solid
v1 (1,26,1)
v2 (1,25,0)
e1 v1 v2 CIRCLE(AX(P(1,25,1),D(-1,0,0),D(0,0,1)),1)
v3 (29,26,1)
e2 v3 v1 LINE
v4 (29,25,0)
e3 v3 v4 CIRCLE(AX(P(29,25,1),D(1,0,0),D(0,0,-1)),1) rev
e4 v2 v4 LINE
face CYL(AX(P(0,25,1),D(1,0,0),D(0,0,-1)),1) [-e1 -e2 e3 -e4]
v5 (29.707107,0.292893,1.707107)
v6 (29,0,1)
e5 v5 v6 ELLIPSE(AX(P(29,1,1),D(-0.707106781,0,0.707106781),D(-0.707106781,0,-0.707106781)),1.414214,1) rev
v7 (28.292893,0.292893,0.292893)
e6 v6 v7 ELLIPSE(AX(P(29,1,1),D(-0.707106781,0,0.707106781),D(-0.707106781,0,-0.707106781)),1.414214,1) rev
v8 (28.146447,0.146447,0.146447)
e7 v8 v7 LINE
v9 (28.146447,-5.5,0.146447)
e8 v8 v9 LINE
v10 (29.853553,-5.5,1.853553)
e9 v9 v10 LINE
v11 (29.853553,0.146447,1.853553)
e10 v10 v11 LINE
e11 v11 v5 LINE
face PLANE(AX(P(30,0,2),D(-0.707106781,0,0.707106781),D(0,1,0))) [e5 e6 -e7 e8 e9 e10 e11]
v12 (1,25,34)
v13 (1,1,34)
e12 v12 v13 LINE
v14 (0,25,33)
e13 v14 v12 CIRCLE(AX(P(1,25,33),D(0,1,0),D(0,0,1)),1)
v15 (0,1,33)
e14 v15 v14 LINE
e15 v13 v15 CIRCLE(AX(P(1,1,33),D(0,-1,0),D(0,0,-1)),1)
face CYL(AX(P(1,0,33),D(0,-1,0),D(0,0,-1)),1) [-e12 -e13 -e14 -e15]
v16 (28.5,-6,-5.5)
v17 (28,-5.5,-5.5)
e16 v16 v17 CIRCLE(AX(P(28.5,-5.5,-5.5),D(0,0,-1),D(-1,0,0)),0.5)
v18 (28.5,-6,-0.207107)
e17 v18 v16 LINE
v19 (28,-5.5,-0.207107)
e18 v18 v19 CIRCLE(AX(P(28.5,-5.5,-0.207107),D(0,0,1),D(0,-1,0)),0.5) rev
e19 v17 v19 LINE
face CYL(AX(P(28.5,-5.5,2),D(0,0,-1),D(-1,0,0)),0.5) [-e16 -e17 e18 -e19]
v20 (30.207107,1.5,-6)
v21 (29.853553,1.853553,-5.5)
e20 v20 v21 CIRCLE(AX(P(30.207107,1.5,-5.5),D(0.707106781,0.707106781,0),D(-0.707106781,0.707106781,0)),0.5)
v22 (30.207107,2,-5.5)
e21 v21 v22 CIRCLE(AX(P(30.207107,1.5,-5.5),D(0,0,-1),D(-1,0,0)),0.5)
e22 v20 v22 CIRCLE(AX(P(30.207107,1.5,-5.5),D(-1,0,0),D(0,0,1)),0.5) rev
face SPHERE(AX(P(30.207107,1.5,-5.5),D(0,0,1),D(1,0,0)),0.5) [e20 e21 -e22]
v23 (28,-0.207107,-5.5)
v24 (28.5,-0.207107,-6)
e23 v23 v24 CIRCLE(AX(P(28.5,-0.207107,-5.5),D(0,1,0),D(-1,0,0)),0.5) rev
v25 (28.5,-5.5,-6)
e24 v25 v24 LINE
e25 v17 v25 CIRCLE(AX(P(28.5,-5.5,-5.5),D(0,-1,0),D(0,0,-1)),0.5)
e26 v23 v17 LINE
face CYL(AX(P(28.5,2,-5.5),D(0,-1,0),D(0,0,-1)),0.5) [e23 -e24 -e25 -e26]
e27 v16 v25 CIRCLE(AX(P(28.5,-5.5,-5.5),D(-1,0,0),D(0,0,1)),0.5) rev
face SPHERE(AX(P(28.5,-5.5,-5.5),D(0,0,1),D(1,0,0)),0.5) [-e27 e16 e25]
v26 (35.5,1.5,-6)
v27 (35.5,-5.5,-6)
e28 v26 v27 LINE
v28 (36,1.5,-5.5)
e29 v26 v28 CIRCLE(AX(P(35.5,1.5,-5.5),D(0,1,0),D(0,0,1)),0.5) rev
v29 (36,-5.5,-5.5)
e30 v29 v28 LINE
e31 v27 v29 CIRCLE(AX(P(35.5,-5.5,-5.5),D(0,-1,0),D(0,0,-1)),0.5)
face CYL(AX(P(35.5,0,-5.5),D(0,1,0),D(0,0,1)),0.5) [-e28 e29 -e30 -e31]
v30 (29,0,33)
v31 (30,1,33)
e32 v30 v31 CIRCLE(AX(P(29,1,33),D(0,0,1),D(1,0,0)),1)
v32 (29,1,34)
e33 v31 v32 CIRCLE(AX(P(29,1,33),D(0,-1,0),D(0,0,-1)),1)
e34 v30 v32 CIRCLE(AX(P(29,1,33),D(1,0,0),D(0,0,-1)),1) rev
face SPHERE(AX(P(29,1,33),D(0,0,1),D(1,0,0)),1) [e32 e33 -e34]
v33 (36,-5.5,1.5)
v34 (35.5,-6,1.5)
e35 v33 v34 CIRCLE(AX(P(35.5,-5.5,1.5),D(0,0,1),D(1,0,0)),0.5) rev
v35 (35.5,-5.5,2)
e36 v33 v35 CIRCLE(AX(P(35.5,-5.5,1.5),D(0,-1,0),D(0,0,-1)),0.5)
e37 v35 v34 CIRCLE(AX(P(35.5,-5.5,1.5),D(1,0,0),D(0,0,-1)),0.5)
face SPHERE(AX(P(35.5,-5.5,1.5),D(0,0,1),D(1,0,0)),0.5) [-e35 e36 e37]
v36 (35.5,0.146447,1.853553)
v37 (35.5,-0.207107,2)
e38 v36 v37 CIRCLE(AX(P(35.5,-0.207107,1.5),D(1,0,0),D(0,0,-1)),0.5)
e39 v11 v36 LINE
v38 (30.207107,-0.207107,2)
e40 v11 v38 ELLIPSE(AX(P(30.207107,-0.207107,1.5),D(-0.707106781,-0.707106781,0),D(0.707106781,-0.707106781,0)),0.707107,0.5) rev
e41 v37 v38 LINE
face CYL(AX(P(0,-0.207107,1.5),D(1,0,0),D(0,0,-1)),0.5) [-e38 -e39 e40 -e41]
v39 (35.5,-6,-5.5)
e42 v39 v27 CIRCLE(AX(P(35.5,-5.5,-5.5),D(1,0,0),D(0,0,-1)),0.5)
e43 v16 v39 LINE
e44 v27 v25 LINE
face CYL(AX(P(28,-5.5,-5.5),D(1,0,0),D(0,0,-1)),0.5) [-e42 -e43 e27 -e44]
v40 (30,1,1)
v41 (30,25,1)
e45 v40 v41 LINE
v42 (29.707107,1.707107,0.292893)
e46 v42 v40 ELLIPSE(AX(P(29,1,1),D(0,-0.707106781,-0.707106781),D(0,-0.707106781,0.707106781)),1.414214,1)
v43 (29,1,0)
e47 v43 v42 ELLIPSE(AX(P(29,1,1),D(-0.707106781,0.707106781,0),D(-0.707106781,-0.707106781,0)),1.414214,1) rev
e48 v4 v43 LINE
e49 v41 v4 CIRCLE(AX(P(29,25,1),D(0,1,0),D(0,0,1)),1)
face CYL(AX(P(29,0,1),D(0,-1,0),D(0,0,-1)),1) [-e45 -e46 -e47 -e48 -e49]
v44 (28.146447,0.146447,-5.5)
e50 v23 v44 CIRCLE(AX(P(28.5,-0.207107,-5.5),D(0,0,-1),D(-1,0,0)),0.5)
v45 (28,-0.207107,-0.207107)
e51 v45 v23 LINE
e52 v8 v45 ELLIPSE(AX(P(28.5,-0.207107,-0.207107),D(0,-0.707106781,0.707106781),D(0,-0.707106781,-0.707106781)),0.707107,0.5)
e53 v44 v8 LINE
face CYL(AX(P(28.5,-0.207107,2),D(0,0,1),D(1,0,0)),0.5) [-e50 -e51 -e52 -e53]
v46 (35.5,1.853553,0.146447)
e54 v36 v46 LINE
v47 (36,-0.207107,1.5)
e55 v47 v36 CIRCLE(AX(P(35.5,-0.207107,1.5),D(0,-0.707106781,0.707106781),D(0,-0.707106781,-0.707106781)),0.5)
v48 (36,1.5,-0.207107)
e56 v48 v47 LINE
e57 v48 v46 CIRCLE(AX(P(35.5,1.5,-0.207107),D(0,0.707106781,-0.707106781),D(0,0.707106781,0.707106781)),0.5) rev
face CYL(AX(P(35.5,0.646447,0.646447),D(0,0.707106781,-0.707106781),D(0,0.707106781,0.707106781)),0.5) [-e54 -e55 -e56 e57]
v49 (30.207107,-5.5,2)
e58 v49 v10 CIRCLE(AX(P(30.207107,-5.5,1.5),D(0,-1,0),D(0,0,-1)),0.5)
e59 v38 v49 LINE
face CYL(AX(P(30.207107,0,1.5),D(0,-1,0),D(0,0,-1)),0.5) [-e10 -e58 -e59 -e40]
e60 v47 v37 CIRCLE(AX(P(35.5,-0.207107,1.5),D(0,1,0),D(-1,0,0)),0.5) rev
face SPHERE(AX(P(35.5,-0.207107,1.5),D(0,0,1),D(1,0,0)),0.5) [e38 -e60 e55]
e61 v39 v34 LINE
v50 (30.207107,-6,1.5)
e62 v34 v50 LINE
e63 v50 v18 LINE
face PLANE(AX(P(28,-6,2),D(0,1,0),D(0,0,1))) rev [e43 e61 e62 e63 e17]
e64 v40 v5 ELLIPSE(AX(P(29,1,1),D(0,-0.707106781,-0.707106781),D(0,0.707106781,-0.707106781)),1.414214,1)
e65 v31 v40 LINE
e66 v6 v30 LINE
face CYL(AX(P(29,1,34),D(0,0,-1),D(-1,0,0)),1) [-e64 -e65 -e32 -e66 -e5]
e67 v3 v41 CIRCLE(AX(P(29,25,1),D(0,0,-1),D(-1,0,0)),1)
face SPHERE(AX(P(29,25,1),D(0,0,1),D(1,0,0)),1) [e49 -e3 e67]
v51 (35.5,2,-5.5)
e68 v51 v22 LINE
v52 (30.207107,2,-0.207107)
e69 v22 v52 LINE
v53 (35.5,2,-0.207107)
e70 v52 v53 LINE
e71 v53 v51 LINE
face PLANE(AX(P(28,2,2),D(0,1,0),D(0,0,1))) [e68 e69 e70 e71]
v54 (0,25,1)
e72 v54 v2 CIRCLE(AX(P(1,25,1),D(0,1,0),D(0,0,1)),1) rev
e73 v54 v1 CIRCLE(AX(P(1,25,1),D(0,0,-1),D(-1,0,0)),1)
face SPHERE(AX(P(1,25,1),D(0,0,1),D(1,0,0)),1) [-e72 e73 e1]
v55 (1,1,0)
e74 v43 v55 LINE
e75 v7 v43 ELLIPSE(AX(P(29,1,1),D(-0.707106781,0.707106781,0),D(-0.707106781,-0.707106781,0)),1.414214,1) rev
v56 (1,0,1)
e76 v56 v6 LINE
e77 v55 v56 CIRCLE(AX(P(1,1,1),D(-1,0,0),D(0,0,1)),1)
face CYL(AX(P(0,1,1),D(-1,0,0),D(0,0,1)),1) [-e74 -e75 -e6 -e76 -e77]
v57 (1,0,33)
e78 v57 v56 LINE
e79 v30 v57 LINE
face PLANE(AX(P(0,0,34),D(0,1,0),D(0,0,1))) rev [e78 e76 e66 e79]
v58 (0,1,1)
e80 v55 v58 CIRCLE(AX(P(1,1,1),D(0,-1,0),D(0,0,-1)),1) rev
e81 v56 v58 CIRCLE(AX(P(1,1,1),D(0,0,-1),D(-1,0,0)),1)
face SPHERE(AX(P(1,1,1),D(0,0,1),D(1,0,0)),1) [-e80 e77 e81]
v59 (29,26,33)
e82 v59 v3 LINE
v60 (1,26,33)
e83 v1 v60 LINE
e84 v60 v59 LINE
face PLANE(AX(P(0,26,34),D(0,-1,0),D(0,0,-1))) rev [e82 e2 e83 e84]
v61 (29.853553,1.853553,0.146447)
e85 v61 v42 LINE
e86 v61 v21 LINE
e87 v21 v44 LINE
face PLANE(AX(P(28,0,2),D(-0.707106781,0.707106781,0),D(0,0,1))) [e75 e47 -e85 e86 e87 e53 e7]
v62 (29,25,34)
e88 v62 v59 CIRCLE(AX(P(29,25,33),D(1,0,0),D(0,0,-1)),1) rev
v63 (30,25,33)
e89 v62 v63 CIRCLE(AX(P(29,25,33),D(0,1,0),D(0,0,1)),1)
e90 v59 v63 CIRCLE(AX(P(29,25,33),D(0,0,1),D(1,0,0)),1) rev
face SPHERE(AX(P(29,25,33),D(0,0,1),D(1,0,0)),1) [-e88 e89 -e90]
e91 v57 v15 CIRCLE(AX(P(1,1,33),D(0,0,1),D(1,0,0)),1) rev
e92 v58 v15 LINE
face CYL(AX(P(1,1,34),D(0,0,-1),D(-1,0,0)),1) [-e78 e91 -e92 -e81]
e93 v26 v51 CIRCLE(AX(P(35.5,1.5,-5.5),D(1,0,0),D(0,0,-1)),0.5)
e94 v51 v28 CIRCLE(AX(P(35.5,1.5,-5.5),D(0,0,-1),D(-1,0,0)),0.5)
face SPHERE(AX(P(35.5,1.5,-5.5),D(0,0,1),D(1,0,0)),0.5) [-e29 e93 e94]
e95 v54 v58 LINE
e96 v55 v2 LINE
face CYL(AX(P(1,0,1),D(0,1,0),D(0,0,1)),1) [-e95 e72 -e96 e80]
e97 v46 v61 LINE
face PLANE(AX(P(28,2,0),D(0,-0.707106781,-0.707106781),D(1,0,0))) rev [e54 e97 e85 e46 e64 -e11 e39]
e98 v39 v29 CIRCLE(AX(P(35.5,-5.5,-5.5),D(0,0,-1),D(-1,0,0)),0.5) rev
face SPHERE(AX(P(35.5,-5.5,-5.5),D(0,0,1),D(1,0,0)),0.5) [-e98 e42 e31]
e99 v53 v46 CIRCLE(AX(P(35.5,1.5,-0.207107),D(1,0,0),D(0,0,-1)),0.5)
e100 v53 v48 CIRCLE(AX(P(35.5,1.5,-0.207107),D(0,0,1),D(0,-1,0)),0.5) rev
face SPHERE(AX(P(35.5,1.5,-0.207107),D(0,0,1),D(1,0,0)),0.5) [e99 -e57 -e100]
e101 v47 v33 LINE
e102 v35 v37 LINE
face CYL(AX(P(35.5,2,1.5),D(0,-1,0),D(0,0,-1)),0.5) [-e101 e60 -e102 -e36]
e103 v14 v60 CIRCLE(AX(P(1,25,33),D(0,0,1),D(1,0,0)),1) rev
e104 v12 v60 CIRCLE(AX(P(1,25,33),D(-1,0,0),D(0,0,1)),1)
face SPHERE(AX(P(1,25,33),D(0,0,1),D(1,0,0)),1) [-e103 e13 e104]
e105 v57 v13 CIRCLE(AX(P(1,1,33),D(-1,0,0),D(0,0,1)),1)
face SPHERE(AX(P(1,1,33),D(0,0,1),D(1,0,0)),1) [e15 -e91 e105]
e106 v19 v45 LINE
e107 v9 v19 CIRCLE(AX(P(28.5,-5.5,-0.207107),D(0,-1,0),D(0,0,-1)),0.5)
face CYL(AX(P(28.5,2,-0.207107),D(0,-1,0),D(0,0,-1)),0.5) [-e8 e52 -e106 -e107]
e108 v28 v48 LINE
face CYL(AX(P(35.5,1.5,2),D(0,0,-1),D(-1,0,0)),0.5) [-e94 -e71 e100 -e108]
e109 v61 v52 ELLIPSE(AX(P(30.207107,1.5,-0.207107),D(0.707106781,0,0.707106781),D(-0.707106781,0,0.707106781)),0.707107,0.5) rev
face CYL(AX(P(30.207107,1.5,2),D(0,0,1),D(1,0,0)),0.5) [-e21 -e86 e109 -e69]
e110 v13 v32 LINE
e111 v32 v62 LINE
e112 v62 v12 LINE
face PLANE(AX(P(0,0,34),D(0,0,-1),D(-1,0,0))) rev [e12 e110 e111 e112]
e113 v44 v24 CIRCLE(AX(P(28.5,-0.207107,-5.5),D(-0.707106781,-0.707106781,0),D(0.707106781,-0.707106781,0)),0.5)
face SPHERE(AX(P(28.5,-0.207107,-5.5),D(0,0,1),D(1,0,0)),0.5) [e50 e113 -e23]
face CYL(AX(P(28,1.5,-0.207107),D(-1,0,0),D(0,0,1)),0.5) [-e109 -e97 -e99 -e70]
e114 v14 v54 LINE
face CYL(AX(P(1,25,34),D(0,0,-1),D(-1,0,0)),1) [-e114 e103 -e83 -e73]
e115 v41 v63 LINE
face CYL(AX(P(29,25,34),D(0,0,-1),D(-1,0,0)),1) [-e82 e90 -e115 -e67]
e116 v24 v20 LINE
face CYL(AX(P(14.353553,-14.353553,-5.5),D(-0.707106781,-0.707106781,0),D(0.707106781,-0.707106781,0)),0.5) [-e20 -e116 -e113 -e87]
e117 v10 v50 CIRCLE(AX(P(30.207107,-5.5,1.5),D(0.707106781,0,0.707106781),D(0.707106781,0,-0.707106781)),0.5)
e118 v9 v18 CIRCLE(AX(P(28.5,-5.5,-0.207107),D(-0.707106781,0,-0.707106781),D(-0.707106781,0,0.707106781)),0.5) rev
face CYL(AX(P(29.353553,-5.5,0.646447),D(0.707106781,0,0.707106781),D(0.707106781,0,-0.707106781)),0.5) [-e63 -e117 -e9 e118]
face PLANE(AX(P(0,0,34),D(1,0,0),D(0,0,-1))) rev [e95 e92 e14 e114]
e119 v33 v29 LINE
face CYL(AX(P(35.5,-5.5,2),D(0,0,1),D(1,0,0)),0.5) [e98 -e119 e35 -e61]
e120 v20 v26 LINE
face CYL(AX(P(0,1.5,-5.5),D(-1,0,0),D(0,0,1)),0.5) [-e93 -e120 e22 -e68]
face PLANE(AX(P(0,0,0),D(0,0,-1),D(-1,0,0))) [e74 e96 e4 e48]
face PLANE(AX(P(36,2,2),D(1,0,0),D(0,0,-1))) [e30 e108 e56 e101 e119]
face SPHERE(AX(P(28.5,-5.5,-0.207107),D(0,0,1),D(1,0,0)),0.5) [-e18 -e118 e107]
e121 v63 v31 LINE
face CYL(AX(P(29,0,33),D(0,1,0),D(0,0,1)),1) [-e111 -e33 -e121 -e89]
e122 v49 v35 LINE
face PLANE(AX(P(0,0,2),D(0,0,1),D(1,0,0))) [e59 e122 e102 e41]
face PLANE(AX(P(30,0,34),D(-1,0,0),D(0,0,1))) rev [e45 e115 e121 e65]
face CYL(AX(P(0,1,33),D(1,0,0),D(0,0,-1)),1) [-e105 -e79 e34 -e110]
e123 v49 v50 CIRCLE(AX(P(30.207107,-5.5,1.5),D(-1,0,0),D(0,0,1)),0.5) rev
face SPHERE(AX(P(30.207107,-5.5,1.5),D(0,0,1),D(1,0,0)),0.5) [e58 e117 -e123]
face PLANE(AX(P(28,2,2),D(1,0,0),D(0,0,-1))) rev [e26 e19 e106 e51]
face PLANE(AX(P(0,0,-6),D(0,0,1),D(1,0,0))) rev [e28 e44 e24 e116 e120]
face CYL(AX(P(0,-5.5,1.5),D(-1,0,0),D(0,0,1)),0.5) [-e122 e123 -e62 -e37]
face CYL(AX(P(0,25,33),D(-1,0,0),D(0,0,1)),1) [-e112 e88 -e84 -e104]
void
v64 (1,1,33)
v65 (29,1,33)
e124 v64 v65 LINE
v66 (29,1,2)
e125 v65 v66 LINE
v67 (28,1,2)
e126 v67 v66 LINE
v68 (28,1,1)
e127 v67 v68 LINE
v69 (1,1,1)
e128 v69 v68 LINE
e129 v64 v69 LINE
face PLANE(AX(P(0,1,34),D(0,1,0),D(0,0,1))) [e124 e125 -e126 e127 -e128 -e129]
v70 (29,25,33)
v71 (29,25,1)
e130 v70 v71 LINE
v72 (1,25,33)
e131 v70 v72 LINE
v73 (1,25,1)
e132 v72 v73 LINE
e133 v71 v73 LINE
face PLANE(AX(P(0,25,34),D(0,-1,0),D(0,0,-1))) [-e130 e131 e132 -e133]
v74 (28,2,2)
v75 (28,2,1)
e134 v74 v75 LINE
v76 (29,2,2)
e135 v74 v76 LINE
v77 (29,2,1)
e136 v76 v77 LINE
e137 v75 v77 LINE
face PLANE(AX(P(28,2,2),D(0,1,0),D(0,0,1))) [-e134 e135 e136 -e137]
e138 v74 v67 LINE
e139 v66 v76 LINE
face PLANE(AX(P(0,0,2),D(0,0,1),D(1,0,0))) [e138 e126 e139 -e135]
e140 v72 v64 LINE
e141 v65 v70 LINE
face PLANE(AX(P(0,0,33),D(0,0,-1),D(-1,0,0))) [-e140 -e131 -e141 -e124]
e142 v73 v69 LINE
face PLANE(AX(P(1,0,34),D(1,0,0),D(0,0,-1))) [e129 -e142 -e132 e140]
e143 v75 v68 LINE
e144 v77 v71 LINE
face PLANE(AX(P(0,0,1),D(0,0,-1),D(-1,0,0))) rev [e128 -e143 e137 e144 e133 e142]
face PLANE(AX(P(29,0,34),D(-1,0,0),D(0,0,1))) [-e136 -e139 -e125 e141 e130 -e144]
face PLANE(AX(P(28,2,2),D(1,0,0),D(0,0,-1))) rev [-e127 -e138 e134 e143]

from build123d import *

# Parameters (mm, degrees)
SKETCH1_W                = 30
SKETCH1_H                = 26
BOSS_EXTRUDE1_DEPTH      = 34
SHELL1_T                 = 1
BOSS_EXTRUDE3_DEPTH      = 6
BOSS_EXTRUDE3_DEPTH_BACK = 2
SKETCH2_W                = 8
SKETCH2_H                = 8
CHAMFER2_SIZE            = 2
FILLET1_R                = 1
FILLET2_R                = 0.5


with BuildPart() as part:
    # Sketch1 → Boss-Extrude1 (new body)
    with BuildSketch(Plane.XY):
        with Locations((15, 13)):
            Rectangle(SKETCH1_W, SKETCH1_H)
    extrude(amount=BOSS_EXTRUDE1_DEPTH)

    # Shell1 (no face opened: a closed hollow body)
    add(offset(amount=-SHELL1_T, mode=Mode.PRIVATE), mode=Mode.SUBTRACT)

    # Sketch2 → Boss-Extrude3 (add, two sides: drawn at the far end of the back side and taken through both)
    with BuildSketch(Plane(origin=(0, 0, 0), x_dir=(-1, 0, 0), z_dir=(0, 0, -1)).offset(-BOSS_EXTRUDE3_DEPTH_BACK)):
        with Locations((-32, -2)):
            Rectangle(SKETCH2_W, SKETCH2_H)
    extrude(amount=BOSS_EXTRUDE3_DEPTH + BOSS_EXTRUDE3_DEPTH_BACK)

    # Chamfer2
    chamfer2_edges = [part.edges().sort_by_distance(p)[0] for p in [
        (28, -3, 2),
        (28, 2, -3),
        (33, 2, 2),
    ]]
    chamfer(chamfer2_edges, length=CHAMFER2_SIZE)

    # Fillet1
    # the kernel refuses this fillet: 1 mm, written as the material it takes off along each edge
    with BuildSketch(Plane(origin=(1, 25, 1), x_dir=(0, 1, 0), z_dir=(0, 0, -1))) as fillet1_piece_1_section:
        Polygon((0, 0), (FILLET1_R, 0), (FILLET1_R, -FILLET1_R), (0, -FILLET1_R), align=None)
    fillet1_piece_1 = extrude(amount=FILLET1_R, mode=Mode.PRIVATE)
    fillet1_piece_1 = fillet1_piece_1 - Plane(origin=(1, 25, 1), x_dir=(0.7071067811865475, -0.7071067811865475, 0), z_dir=(0, 0, -1)) * Sphere(FILLET1_R, mode=Mode.PRIVATE)
    add(fillet1_piece_1, mode=Mode.SUBTRACT)
    with BuildSketch(Plane(origin=(1, 1, 1), x_dir=(0, 0, -1), z_dir=(0, -1, 0))) as fillet1_piece_2_section:
        Polygon((0, 0), (FILLET1_R, 0), (FILLET1_R, -FILLET1_R), (0, -FILLET1_R), align=None)
    fillet1_piece_2 = extrude(amount=FILLET1_R, mode=Mode.PRIVATE)
    fillet1_piece_2 = fillet1_piece_2 - Plane(origin=(1, 1, 1), x_dir=(0.7071067811865475, 0, 0.7071067811865475), z_dir=(0, -1, 0)) * Sphere(FILLET1_R, mode=Mode.PRIVATE)
    add(fillet1_piece_2, mode=Mode.SUBTRACT)
    with BuildSketch(Plane(origin=(29, 25, 1), x_dir=(0, 0, -1), z_dir=(0, 1, 0))) as fillet1_piece_3_section:
        Polygon((0, 0), (FILLET1_R, 0), (FILLET1_R, -FILLET1_R), (0, -FILLET1_R), align=None)
    fillet1_piece_3 = extrude(amount=FILLET1_R, mode=Mode.PRIVATE)
    fillet1_piece_3 = fillet1_piece_3 - Plane(origin=(29, 25, 1), x_dir=(-0.7071067811865475, 0, 0.7071067811865475), z_dir=(0, 1, 0)) * Sphere(FILLET1_R, mode=Mode.PRIVATE)
    add(fillet1_piece_3, mode=Mode.SUBTRACT)
    with BuildSketch(Plane(origin=(1, 1, 33), x_dir=(-1, 0, 0), z_dir=(0, -1, 0))) as fillet1_piece_4_section:
        Polygon((0, 0), (FILLET1_R, 0), (FILLET1_R, -FILLET1_R), (0, -FILLET1_R), align=None)
    fillet1_piece_4 = extrude(amount=FILLET1_R, mode=Mode.PRIVATE)
    fillet1_piece_4 = fillet1_piece_4 - Plane(origin=(1, 1, 33), x_dir=(0.7071067811865475, 0, -0.7071067811865475), z_dir=(0, -1, 0)) * Sphere(FILLET1_R, mode=Mode.PRIVATE)
    add(fillet1_piece_4, mode=Mode.SUBTRACT)
    with BuildSketch(Plane(origin=(29, 1, 33), x_dir=(1, 0, 0), z_dir=(0, -1, 0))) as fillet1_piece_5_section:
        Polygon((0, 0), (FILLET1_R, 0), (FILLET1_R, FILLET1_R), (0, FILLET1_R), align=None)
    fillet1_piece_5 = extrude(amount=FILLET1_R, mode=Mode.PRIVATE)
    fillet1_piece_5 = fillet1_piece_5 - Plane(origin=(29, 1, 33), x_dir=(-0.7071067811865475, 0, -0.7071067811865475), z_dir=(0, -1, 0)) * Sphere(FILLET1_R, mode=Mode.PRIVATE)
    add(fillet1_piece_5, mode=Mode.SUBTRACT)
    with BuildSketch(Plane(origin=(29, 25, 33), x_dir=(1, 0, 0), z_dir=(0, 1, 0))) as fillet1_piece_6_section:
        Polygon((0, 0), (FILLET1_R, 0), (FILLET1_R, -FILLET1_R), (0, -FILLET1_R), align=None)
    fillet1_piece_6 = extrude(amount=FILLET1_R, mode=Mode.PRIVATE)
    fillet1_piece_6 = fillet1_piece_6 - Plane(origin=(29, 25, 33), x_dir=(-0.7071067811865475, 0, -0.7071067811865475), z_dir=(0, 1, 0)) * Sphere(FILLET1_R, mode=Mode.PRIVATE)
    add(fillet1_piece_6, mode=Mode.SUBTRACT)
    with BuildSketch(Plane(origin=(1, 25, 33), x_dir=(-1, 0, 0), z_dir=(0, 1, 0))) as fillet1_piece_7_section:
        Polygon((0, 0), (FILLET1_R, 0), (FILLET1_R, FILLET1_R), (0, FILLET1_R), align=None)
    fillet1_piece_7 = extrude(amount=FILLET1_R, mode=Mode.PRIVATE)
    fillet1_piece_7 = fillet1_piece_7 - Plane(origin=(1, 25, 33), x_dir=(0.7071067811865475, 0, -0.7071067811865475), z_dir=(0, 1, 0)) * Sphere(FILLET1_R, mode=Mode.PRIVATE)
    add(fillet1_piece_7, mode=Mode.SUBTRACT)
    with BuildSketch(Plane(origin=(0, 25, 0), x_dir=(1, 0, 0), z_dir=(0, -1, 0)), Plane(origin=(30, 1, 34), x_dir=(0, 0, -1), z_dir=(0, 1, 0)), Plane(origin=(0, 25, 34), x_dir=(0, 0, -1), z_dir=(0, -1, 0))) as fillet1_piece_8:
        with BuildLine():
            CenterArc((FILLET1_R, FILLET1_R), FILLET1_R, 180, 90)
            Line((0, FILLET1_R), (0, 0))
            Line((0, 0), (FILLET1_R, 0))
        make_face()
    extrude(amount=24, mode=Mode.SUBTRACT)
    with BuildSketch(Plane(origin=(1, 0, 0), x_dir=(0, 0, 1), z_dir=(1, 0, 0))) as fillet1_piece_9_section:
        with BuildLine():
            CenterArc((FILLET1_R, -FILLET1_R), FILLET1_R, 90, 90)
            Line((0, -FILLET1_R), (0, 0))
            Line((0, 0), (FILLET1_R, 0))
        make_face()
    fillet1_piece_9 = extrude(amount=29.5, mode=Mode.PRIVATE)
    fillet1_piece_9 = split(fillet1_piece_9, bisect_by=Plane(origin=(21.381816869, 0.226411675, -6.618183131), z_dir=(-0.7071067811865476, 0, 0.7071067811865476)), keep=Keep.TOP, mode=Mode.PRIVATE)
    fillet1_piece_9 = split(fillet1_piece_9, bisect_by=Plane(origin=(21.381816869, -6.618183131, 0.226411675), z_dir=(-0.7071067811865476, 0.7071067811865476, 0)), keep=Keep.TOP, mode=Mode.PRIVATE)
    add(fillet1_piece_9, mode=Mode.SUBTRACT)
    with BuildSketch(Plane(origin=(1, 0, 0), x_dir=(0, 0, 1), z_dir=(1, 0, 0))) as fillet1_piece_10_section:
        with BuildLine():
            CenterArc((FILLET1_R, -FILLET1_R), FILLET1_R, 90, 90)
            Line((0, -FILLET1_R), (0, 0))
            Line((0, 0), (FILLET1_R, 0))
        make_face()
    fillet1_piece_10 = extrude(amount=29.5, mode=Mode.PRIVATE)
    fillet1_piece_10 = split(fillet1_piece_10, bisect_by=Plane(origin=(28.16446835, 0.528927527, 0.16446835), z_dir=(0.7071067811865476, 0, -0.7071067811865476)), keep=Keep.TOP, mode=Mode.PRIVATE)
    fillet1_piece_10 = split(fillet1_piece_10, bisect_by=Plane(origin=(28.407441135, 0.407441135, 0.042981958), z_dir=(-0.7071067811865476, 0.7071067811865476, 0)), keep=Keep.TOP, mode=Mode.PRIVATE)
    add(fillet1_piece_10, mode=Mode.SUBTRACT)
    with BuildSketch(Plane(origin=(1, 0, 0), x_dir=(0, 0, 1), z_dir=(1, 0, 0))) as fillet1_piece_11_section:
        with BuildLine():
            CenterArc((FILLET1_R, -FILLET1_R), FILLET1_R, 90, 90)
            Line((0, -FILLET1_R), (0, 0))
            Line((0, 0), (FILLET1_R, 0))
        make_face()
    fillet1_piece_11 = extrude(amount=29.5, mode=Mode.PRIVATE)
    fillet1_piece_11 = split(fillet1_piece_11, bisect_by=Plane(origin=(28.407441135, 0.042981958, 0.407441135), z_dir=(-0.7071067811865476, 0, 0.7071067811865476)), keep=Keep.TOP, mode=Mode.PRIVATE)
    fillet1_piece_11 = split(fillet1_piece_11, bisect_by=Plane(origin=(28.16446835, 0.16446835, 0.528927527), z_dir=(0.7071067811865476, -0.7071067811865476, 0)), keep=Keep.TOP, mode=Mode.PRIVATE)
    add(fillet1_piece_11, mode=Mode.SUBTRACT)
    with BuildSketch(Plane(origin=(30, -0.5, 0), x_dir=(-1, 0, 0), z_dir=(0, 1, 0))) as fillet1_piece_12_section:
        with BuildLine():
            CenterArc((FILLET1_R, FILLET1_R), FILLET1_R, 180, 90)
            Line((0, FILLET1_R), (0, 0))
            Line((0, 0), (FILLET1_R, 0))
        make_face()
    fillet1_piece_12 = extrude(amount=25.5, mode=Mode.PRIVATE)
    fillet1_piece_12 = split(fillet1_piece_12, bisect_by=Plane(origin=(29.83553165, 1.83553165, 0.528927527), z_dir=(0.7071067811865476, -0.7071067811865476, 0)), keep=Keep.TOP, mode=Mode.PRIVATE)
    fillet1_piece_12 = split(fillet1_piece_12, bisect_by=Plane(origin=(29.957018042, 1.592558865, 0.407441135), z_dir=(0, 0.7071067811865476, 0.7071067811865476)), keep=Keep.TOP, mode=Mode.PRIVATE)
    add(fillet1_piece_12, mode=Mode.SUBTRACT)
    with BuildSketch(Plane(origin=(30, -0.5, 0), x_dir=(-1, 0, 0), z_dir=(0, 1, 0))) as fillet1_piece_13_section:
        with BuildLine():
            CenterArc((FILLET1_R, FILLET1_R), FILLET1_R, 180, 90)
            Line((0, FILLET1_R), (0, 0))
            Line((0, 0), (FILLET1_R, 0))
        make_face()
    fillet1_piece_13 = extrude(amount=25.5, mode=Mode.PRIVATE)
    fillet1_piece_13 = split(fillet1_piece_13, bisect_by=Plane(origin=(29.592558865, 1.592558865, 0.042981958), z_dir=(-0.7071067811865476, 0.7071067811865476, 0)), keep=Keep.TOP, mode=Mode.PRIVATE)
    fillet1_piece_13 = split(fillet1_piece_13, bisect_by=Plane(origin=(29.471072473, 1.83553165, 0.16446835), z_dir=(0, -0.7071067811865476, -0.7071067811865476)), keep=Keep.TOP, mode=Mode.PRIVATE)
    add(fillet1_piece_13, mode=Mode.SUBTRACT)
    with BuildSketch(Plane(origin=(30, -0.5, 0), x_dir=(-1, 0, 0), z_dir=(0, 1, 0))) as fillet1_piece_14_section:
        with BuildLine():
            CenterArc((FILLET1_R, FILLET1_R), FILLET1_R, 180, 90)
            Line((0, FILLET1_R), (0, 0))
            Line((0, 0), (FILLET1_R, 0))
        make_face()
    fillet1_piece_14 = extrude(amount=25.5, mode=Mode.PRIVATE)
    fillet1_piece_14 = split(fillet1_piece_14, bisect_by=Plane(origin=(35.618173362, 7.618173362, 0.226414546), z_dir=(-0.7071067811865476, 0.7071067811865476, 0)), keep=Keep.TOP, mode=Mode.PRIVATE)
    fillet1_piece_14 = split(fillet1_piece_14, bisect_by=Plane(origin=(29.773585454, 7.618173362, -5.618173362), z_dir=(0, 0.7071067811865476, 0.7071067811865476)), keep=Keep.TOP, mode=Mode.PRIVATE)
    add(fillet1_piece_14, mode=Mode.SUBTRACT)
    with BuildSketch(Plane(origin=(29, 26, 0), x_dir=(0, -1, 0), z_dir=(-1, 0, 0)), Plane(origin=(1, 0, 34), x_dir=(0, 0, -1), z_dir=(1, 0, 0))) as fillet1_piece_15:
        with BuildLine():
            CenterArc((FILLET1_R, FILLET1_R), FILLET1_R, 180, 90)
            Line((0, FILLET1_R), (0, 0))
            Line((0, 0), (FILLET1_R, 0))
        make_face()
    extrude(amount=28, mode=Mode.SUBTRACT)
    with BuildSketch(Plane(origin=(29, 26, 34), x_dir=(0, -1, 0), z_dir=(-1, 0, 0))) as fillet1_piece_16:
        with BuildLine():
            CenterArc((FILLET1_R, -FILLET1_R), FILLET1_R, 90, 90)
            Line((0, -FILLET1_R), (0, 0))
            Line((0, 0), (FILLET1_R, 0))
        make_face()
    extrude(amount=28, mode=Mode.SUBTRACT)
    with BuildSketch(Plane(origin=(0, 26, 1), x_dir=(0, -1, 0), z_dir=(0, 0, 1)), Plane(origin=(0, 0, 1), x_dir=(1, 0, 0), z_dir=(0, 0, 1))) as fillet1_piece_17:
        with BuildLine():
            CenterArc((FILLET1_R, FILLET1_R), FILLET1_R, 180, 90)
            Line((0, FILLET1_R), (0, 0))
            Line((0, 0), (FILLET1_R, 0))
        make_face()
    extrude(amount=32, mode=Mode.SUBTRACT)
    with BuildSketch(Plane(origin=(30, 26, 1), x_dir=(0, -1, 0), z_dir=(0, 0, 1))) as fillet1_piece_18:
        with BuildLine():
            CenterArc((FILLET1_R, -FILLET1_R), FILLET1_R, 90, 90)
            Line((0, -FILLET1_R), (0, 0))
            Line((0, 0), (FILLET1_R, 0))
        make_face()
    extrude(amount=32, mode=Mode.SUBTRACT)
    with BuildSketch(Plane(origin=(30, 0, -0.5), x_dir=(-1, 0, 0), z_dir=(0, 0, 1))) as fillet1_piece_19_section:
        with BuildLine():
            CenterArc((FILLET1_R, -FILLET1_R), FILLET1_R, 90, 90)
            Line((0, -FILLET1_R), (0, 0))
            Line((0, 0), (FILLET1_R, 0))
        make_face()
    fillet1_piece_19 = extrude(amount=33.5, mode=Mode.PRIVATE)
    fillet1_piece_19 = split(fillet1_piece_19, bisect_by=Plane(origin=(29.83553165, 0.528927527, 1.83553165), z_dir=(0.7071067811865476, 0, -0.7071067811865476)), keep=Keep.TOP, mode=Mode.PRIVATE)
    fillet1_piece_19 = split(fillet1_piece_19, bisect_by=Plane(origin=(29.957018042, 0.407441135, 1.592558865), z_dir=(0, 0.7071067811865476, 0.7071067811865476)), keep=Keep.TOP, mode=Mode.PRIVATE)
    add(fillet1_piece_19, mode=Mode.SUBTRACT)
    with BuildSketch(Plane(origin=(30, 0, -0.5), x_dir=(-1, 0, 0), z_dir=(0, 0, 1))) as fillet1_piece_20_section:
        with BuildLine():
            CenterArc((FILLET1_R, -FILLET1_R), FILLET1_R, 90, 90)
            Line((0, -FILLET1_R), (0, 0))
            Line((0, 0), (FILLET1_R, 0))
        make_face()
    fillet1_piece_20 = extrude(amount=33.5, mode=Mode.PRIVATE)
    fillet1_piece_20 = split(fillet1_piece_20, bisect_by=Plane(origin=(29.592558865, 0.042981958, 1.592558865), z_dir=(-0.7071067811865476, 0, 0.7071067811865476)), keep=Keep.TOP, mode=Mode.PRIVATE)
    fillet1_piece_20 = split(fillet1_piece_20, bisect_by=Plane(origin=(29.471072473, 0.16446835, 1.83553165), z_dir=(0, -0.7071067811865476, -0.7071067811865476)), keep=Keep.TOP, mode=Mode.PRIVATE)
    add(fillet1_piece_20, mode=Mode.SUBTRACT)
    with BuildSketch(Plane(origin=(30, 0, -0.5), x_dir=(-1, 0, 0), z_dir=(0, 0, 1))) as fillet1_piece_21_section:
        with BuildLine():
            CenterArc((FILLET1_R, -FILLET1_R), FILLET1_R, 90, 90)
            Line((0, -FILLET1_R), (0, 0))
            Line((0, 0), (FILLET1_R, 0))
        make_face()
    fillet1_piece_21 = extrude(amount=33.5, mode=Mode.PRIVATE)
    fillet1_piece_21 = split(fillet1_piece_21, bisect_by=Plane(origin=(37.618190384, 0.226409543, 9.618190384), z_dir=(-0.7071067811865476, 0, 0.7071067811865476)), keep=Keep.TOP, mode=Mode.PRIVATE)
    fillet1_piece_21 = split(fillet1_piece_21, bisect_by=Plane(origin=(29.773590457, -7.618190384, 9.618190384), z_dir=(0, 0.7071067811865476, 0.7071067811865476)), keep=Keep.TOP, mode=Mode.PRIVATE)
    add(fillet1_piece_21, mode=Mode.SUBTRACT)

    # Fillet2
    fillet2_edges = [part.edges().sort_by_distance(p)[0] for p in [
        (32, -6, -6),
        (36, -6, -2),
        (36, -2, -6),
        (36, 2, -3),
        (33, 2, -6),
        (30, 2, -3),
        (33, 2, 0),
        (36, -3, 2),
        (36, 1, 1),
        (33, -6, 2),
        (30, -3, 2),
        (33, 0, 2),
        (28, -3, -6),
        (28, -6, -3),
        (28, -3, 0),
        (28, 0, -3),
        (29, 1, -6),
        (29, -6, 1),
    ]]
    fillet(fillet2_edges, radius=FILLET2_R)


solid = part.part
